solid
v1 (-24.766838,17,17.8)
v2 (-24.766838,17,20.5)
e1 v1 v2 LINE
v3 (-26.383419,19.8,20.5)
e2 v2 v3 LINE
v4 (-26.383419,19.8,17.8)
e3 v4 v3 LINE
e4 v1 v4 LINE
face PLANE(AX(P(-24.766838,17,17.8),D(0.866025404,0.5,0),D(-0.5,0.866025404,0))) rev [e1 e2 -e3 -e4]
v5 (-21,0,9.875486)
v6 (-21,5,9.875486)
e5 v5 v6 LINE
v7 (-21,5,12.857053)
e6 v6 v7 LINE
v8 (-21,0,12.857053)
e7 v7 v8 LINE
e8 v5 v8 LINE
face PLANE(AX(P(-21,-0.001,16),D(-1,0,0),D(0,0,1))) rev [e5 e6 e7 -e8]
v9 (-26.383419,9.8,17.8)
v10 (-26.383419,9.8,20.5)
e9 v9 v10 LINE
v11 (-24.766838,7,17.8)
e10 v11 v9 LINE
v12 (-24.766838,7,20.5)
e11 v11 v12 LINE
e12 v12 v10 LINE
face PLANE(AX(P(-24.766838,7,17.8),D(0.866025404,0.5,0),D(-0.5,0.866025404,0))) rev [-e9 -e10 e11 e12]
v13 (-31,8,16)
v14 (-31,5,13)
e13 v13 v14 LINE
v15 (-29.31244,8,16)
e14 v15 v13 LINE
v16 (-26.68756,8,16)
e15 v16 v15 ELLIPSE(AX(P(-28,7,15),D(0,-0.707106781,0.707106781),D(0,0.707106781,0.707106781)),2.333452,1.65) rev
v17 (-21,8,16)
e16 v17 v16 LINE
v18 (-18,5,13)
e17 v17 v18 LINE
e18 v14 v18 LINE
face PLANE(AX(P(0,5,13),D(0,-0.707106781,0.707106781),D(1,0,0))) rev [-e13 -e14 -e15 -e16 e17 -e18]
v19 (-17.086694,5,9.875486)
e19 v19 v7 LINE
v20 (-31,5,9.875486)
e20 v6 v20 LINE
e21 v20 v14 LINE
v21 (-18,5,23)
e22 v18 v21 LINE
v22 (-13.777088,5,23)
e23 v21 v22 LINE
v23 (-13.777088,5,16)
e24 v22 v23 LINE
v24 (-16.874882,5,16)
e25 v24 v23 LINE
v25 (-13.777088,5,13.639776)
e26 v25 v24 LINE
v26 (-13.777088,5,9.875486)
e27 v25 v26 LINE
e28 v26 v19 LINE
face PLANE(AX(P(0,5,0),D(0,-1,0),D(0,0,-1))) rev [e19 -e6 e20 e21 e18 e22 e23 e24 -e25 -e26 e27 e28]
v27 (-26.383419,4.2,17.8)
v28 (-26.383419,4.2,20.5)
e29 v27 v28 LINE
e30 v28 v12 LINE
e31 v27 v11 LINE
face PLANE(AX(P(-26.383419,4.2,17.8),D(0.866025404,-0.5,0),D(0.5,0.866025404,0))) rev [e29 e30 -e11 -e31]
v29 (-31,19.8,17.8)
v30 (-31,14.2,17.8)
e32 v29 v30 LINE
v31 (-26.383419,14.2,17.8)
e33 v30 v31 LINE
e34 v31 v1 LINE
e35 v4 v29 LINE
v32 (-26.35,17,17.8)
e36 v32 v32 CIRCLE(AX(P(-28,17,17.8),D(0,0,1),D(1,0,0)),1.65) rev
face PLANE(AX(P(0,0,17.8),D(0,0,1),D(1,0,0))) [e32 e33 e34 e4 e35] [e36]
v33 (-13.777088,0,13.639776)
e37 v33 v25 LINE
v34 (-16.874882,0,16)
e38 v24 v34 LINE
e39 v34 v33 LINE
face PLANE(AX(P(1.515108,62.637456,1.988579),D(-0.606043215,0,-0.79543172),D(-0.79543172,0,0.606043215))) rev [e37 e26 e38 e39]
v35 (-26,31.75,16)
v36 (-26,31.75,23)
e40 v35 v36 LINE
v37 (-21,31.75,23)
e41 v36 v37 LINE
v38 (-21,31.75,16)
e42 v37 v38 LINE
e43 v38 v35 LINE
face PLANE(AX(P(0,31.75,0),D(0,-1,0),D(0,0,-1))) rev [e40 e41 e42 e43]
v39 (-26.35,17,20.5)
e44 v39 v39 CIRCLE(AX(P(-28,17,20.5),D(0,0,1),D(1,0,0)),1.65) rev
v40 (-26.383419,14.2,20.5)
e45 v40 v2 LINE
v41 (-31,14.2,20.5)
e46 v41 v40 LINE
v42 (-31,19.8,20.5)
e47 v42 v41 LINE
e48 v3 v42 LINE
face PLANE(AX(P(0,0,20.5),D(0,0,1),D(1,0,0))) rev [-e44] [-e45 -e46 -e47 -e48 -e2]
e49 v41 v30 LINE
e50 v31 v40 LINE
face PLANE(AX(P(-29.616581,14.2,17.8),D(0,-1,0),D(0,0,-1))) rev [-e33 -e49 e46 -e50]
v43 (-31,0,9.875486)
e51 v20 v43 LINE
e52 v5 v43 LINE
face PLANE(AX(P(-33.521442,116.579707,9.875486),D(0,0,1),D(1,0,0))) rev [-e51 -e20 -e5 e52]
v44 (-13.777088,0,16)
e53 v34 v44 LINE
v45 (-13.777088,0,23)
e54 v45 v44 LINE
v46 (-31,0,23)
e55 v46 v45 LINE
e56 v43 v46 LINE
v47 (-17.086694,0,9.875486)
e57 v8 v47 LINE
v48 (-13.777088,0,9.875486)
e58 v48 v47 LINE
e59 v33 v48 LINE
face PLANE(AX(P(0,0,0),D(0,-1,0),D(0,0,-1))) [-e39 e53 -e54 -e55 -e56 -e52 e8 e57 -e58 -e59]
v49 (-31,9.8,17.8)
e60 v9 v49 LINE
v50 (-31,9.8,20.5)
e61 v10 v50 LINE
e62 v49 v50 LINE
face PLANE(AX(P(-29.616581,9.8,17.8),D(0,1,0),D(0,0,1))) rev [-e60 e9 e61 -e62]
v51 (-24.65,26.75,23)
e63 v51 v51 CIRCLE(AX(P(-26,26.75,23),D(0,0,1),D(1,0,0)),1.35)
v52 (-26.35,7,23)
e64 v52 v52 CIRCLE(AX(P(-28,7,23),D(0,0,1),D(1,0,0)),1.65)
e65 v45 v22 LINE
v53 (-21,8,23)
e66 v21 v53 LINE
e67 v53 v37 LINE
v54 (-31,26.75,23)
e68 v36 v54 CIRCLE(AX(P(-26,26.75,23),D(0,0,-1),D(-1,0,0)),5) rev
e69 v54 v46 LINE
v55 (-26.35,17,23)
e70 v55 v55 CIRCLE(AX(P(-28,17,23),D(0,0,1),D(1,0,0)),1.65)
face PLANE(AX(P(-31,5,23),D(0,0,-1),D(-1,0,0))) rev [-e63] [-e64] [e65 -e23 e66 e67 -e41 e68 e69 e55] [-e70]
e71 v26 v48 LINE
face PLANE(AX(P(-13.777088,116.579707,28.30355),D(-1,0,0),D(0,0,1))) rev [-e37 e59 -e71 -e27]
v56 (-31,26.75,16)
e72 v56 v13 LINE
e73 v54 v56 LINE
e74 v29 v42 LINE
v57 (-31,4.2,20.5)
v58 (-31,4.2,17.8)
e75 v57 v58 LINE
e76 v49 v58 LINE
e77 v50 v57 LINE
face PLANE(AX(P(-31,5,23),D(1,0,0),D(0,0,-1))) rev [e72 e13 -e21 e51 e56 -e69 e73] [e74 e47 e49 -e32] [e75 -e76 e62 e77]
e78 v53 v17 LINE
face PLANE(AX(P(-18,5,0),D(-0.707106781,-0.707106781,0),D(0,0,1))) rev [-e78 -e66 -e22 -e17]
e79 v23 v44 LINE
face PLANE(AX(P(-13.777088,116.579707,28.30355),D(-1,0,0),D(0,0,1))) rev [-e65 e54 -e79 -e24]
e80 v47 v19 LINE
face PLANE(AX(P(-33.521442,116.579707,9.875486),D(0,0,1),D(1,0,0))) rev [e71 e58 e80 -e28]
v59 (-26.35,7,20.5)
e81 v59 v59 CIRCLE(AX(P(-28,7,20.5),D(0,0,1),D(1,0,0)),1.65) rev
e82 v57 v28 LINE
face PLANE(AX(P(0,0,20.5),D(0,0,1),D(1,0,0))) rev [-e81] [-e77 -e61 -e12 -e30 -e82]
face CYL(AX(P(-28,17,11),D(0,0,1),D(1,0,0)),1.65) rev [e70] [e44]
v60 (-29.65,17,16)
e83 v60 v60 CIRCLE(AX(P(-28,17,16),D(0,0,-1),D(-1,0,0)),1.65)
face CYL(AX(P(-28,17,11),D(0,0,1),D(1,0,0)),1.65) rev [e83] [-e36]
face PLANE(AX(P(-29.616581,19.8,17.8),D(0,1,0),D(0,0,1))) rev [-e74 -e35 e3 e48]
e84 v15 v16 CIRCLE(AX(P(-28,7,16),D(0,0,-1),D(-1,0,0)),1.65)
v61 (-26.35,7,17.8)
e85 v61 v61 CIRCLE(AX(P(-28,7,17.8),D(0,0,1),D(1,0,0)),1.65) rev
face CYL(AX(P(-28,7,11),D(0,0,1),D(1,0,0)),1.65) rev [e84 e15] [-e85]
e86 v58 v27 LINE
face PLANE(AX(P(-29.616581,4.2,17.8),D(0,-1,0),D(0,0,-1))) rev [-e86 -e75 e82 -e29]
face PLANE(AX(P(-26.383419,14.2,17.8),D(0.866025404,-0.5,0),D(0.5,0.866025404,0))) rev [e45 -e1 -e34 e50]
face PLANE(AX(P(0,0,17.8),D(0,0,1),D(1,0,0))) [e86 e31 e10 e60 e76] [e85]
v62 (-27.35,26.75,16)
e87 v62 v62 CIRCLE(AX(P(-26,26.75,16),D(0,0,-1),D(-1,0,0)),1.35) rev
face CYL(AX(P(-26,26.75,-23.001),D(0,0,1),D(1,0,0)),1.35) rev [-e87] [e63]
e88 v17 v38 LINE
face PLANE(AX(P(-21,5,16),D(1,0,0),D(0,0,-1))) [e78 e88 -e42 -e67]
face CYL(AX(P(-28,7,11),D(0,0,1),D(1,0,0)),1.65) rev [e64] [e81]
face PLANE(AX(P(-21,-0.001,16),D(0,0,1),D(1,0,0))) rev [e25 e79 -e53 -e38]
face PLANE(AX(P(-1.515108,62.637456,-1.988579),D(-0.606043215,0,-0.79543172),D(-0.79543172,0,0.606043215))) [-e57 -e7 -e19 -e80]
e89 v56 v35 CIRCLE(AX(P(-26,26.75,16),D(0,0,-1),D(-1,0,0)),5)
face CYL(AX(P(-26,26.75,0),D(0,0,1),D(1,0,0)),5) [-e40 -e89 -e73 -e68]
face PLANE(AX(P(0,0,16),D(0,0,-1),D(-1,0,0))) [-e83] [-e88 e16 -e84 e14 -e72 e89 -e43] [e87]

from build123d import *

# Parameters (mm, degrees)
SKETCH_1_W           = 62
SKETCH_1_H           = 46
EXTRUDE_1_DEPTH      = 5
SKETCH_2_W           = 10
SKETCH_2_H           = 17
EXTRUDE_2_DEPTH      = 7
SKETCH_3_R           = 1.65
CUT_EXTRUDE_1_DEPTH  = 12
SKETCH_7_W           = 10
SKETCH_7_H           = 7
EXTRUDE_4_DEPTH      = 9.75
CUT_EXTRUDE_4_REACH  = 65.914
SKETCH_8_R           = 1.35
CUT_EXTRUDE_2_DEPTH  = 2.7
CUT_EXTRUDE_3_REACH  = 51.981
SKETCH_5_W           = 42
SKETCH_5_H           = 32
EXTRUDE_3_DEPTH      = 5
CHAMFER_4_SIZE       = 3
FILLET_1_R           = 5
SKETCH_9_OUTSIDE_W   = 80.694
SKETCH_9_OUTSIDE_H   = 64.694
SKETCH_9_OUTSIDE_W_2 = 19.744354218
SKETCH_9_OUTSIDE_H_2 = 18.428063936
CUT_EXTRUDE_5_DEPTH  = 31.75


with BuildPart() as part:
    # 草图1 → 凸台-拉伸1 (new body)
    with BuildSketch(Plane(origin=(0, 0, 0), x_dir=(1, 0, 0), z_dir=(0, 1, 0))):
        Rectangle(SKETCH_1_W, SKETCH_1_H)
    extrude(amount=EXTRUDE_1_DEPTH)

    # 草图2 → 凸台-拉伸2 (add)
    with BuildSketch(Plane.XY.offset(23)):
        with Locations((-26, 13.5)):
            Rectangle(SKETCH_2_W, SKETCH_2_H)
        with Locations((26, 13.5)):
            Rectangle(SKETCH_2_W, SKETCH_2_H)
    extrude_2 = extrude(amount=-EXTRUDE_2_DEPTH)

    # 草图3 → 切除-拉伸1 (cut)
    with BuildSketch(Plane.XY.offset(23)):
        with Locations((-28, 17)):
            Circle(SKETCH_3_R)
        with Locations((-28, 7)):
            Circle(SKETCH_3_R)
        with Locations((28, 7)):
            Circle(SKETCH_3_R)
        with Locations((28, 17)):
            Circle(SKETCH_3_R)
    cut_extrude_1 = extrude(amount=-CUT_EXTRUDE_1_DEPTH, mode=Mode.SUBTRACT)

    # 草图7 → 凸台-拉伸4 (add)
    with BuildSketch(Plane(origin=(0, 22, 0), x_dir=(1, 0, 0), z_dir=(0, 1, 0))):
        with Locations((-26, -19.5)):
            Rectangle(SKETCH_7_W, SKETCH_7_H)
        with Locations((26, -19.5)):
            Rectangle(SKETCH_7_W, SKETCH_7_H)
    extrude_4 = extrude(amount=EXTRUDE_4_DEPTH)

    # 草图8 → 切除-拉伸4 (cut, up to next)
    with BuildSketch(Plane.XY.offset(23), mode=Mode.PRIVATE) as cut_extrude_4_sk1:
        with Locations((-26, 26.75)):
            Circle(SKETCH_8_R)
    cut_extrude_4_tool1 = extrude(cut_extrude_4_sk1.sketch, amount=-CUT_EXTRUDE_4_REACH, mode=Mode.PRIVATE) & part.part
    # 草图8 → 切除-拉伸4 (cut, up to next)
    with BuildSketch(Plane.XY.offset(23), mode=Mode.PRIVATE) as cut_extrude_4_sk2:
        with Locations((26, 26.75)):
            Circle(SKETCH_8_R)
    cut_extrude_4_tool2 = extrude(cut_extrude_4_sk2.sketch, amount=-CUT_EXTRUDE_4_REACH, mode=Mode.PRIVATE) & part.part
    cut_extrude_4_1 = cut_extrude_4_tool1.solids().sort_by_distance((-26, 26.75, 23))[0]
    add(cut_extrude_4_1, mode=Mode.SUBTRACT)
    cut_extrude_4_2 = cut_extrude_4_tool2.solids().sort_by_distance((26, 26.75, 23))[0]
    add(cut_extrude_4_2, mode=Mode.SUBTRACT)
    cut_extrude_4 = cut_extrude_4_1 + cut_extrude_4_2  # 切除-拉伸4 as one shape, for the pattern or mirror that repeats it

    # 草图4 → 切除-拉伸2 (cut)
    with BuildSketch(Plane.XY.offset(20.5)):
        Polygon((-29.616580754, 19.8), (-31.233161507, 19.8), (-31.233161507, 17), (-31.233161507, 14.2), (-29.616580754, 14.2), (-26.383419246, 14.2), (-24.766838493, 17), (-26.383419246, 19.8), align=None)
        Polygon((-24.766838493, 7), (-26.383419246, 9.8), (-29.616580754, 9.8), (-31.233161507, 9.8), (-31.233161507, 7), (-31.233161507, 4.2), (-29.616580754, 4.2), (-26.383419246, 4.2), align=None)
        Polygon((24.766838493, 17), (26.383419246, 14.2), (29.616580754, 14.2), (31.233161507, 14.2), (31.233161507, 17), (31.233161507, 19.8), (29.616580754, 19.8), (26.383419246, 19.8), align=None)
        Polygon((24.766838493, 7), (26.383419246, 4.2), (29.616580754, 4.2), (31.233161507, 4.2), (31.233161507, 7), (31.233161507, 9.8), (29.616580754, 9.8), (26.383419246, 9.8), align=None)
    cut_extrude_2 = extrude(amount=-CUT_EXTRUDE_2_DEPTH, mode=Mode.SUBTRACT)

    # 镜向1: 凸台-拉伸2, 切除-拉伸1, 凸台-拉伸4, 切除-拉伸4, 切除-拉伸2 across plane
    add(extrude_2.mirror(Plane.XY))
    add(cut_extrude_1.mirror(Plane.XY), mode=Mode.SUBTRACT)
    add(extrude_4.mirror(Plane.XY))
    add(cut_extrude_4.mirror(Plane.XY), mode=Mode.SUBTRACT)
    add(cut_extrude_2.mirror(Plane.XY), mode=Mode.SUBTRACT)

    # 草图5 → 切除-拉伸3 (cut, up to next)
    with BuildSketch(Plane(origin=(0, 31.75, 0), x_dir=(1, 0, 0), z_dir=(0, 1, 0)), mode=Mode.PRIVATE) as cut_extrude_3_sk1:
        Rectangle(SKETCH_5_W, SKETCH_5_H)
    cut_extrude_3_tool1 = extrude(cut_extrude_3_sk1.sketch, amount=-CUT_EXTRUDE_3_REACH, mode=Mode.PRIVATE) & part.part
    add(cut_extrude_3_tool1.solids().sort_by_distance((0, 31.75, 0))[0], mode=Mode.SUBTRACT)

    # 草图6 → 凸台-拉伸3 (add)
    with BuildSketch(Plane(origin=(0, 0, 0), x_dir=(1, 0, 0), z_dir=(0, 1, 0))):
        Polygon((-22.515108038, 14.0114207), (-4.12511837, 0), (0, 3.142947329), (-19.484891962, 17.9885793), align=None)
        Polygon((0, 3.142947329), (4.12511837, 0), (22.515108038, 14.0114207), (19.484891962, 17.9885793), align=None)
        Polygon((-4.12511837, 0), (0, -3.142947329), (4.12511837, 0), (0, 3.142947329), align=None)
        Polygon((-19.484891962, -17.9885793), (0, -3.142947329), (-4.12511837, 0), (-22.515108038, -14.0114207), align=None)
        Polygon((0, -3.142947329), (19.484891962, -17.9885793), (22.515108038, -14.0114207), (4.12511837, 0), align=None)
    extrude(amount=EXTRUDE_3_DEPTH)

    # 倒角4
    # the kernel refuses this chamfer: 3 mm, written as the material it adds along each edge
    with BuildSketch(Plane(origin=(-31, 5, 16), x_dir=(0, -0.027495876610586494, -0.9996219169112968), z_dir=(1, 0, 0))) as chamfer_4_piece_1_section:
        Polygon((CHAMFER_4_SIZE * 0.999621916911, CHAMFER_4_SIZE * 0.0274958766106), (-CHAMFER_4_SIZE * 0.0274958766106, CHAMFER_4_SIZE * 0.999621916911), (0, 0), align=None)
    chamfer_4_piece_1 = extrude(amount=10, mode=Mode.PRIVATE)
    chamfer_4_piece_1 = chamfer_4_piece_1 - Plane(origin=(-28, 7, 14.954388988), x_dir=(1, 0, 0), z_dir=(0, 0, 1)) * Cylinder(1.65, 32, mode=Mode.PRIVATE)
    add(chamfer_4_piece_1)
    with BuildSketch(Plane(origin=(-21, 5, 23), x_dir=(-0.02749587661058678, 0.9996219169112968, 0), z_dir=(0, 0, -1)), Plane(origin=(-21, 5, -23), x_dir=(0.9996219169112968, -0.02749587661058648, 0), z_dir=(0, 0, 1)), Plane(origin=(21, 5, 23), x_dir=(-0.9996219169112968, -0.02749587661058619, 0), z_dir=(0, 0, -1))) as chamfer_4_piece_2:
        Polygon((CHAMFER_4_SIZE * 0.999621916911, CHAMFER_4_SIZE * 0.0274958766106), (-CHAMFER_4_SIZE * 0.0274958766106, CHAMFER_4_SIZE * 0.999621916911), (0, 0), align=None)
    extrude(amount=7)
    with BuildSketch(Plane(origin=(-31, 5, -16), x_dir=(0, -0.027495876610586494, 0.9996219169112968), z_dir=(1, 0, 0))) as chamfer_4_piece_3_section:
        Polygon((CHAMFER_4_SIZE * 0.999621916911, -CHAMFER_4_SIZE * 0.0274958766106), (-CHAMFER_4_SIZE * 0.0274958766106, -CHAMFER_4_SIZE * 0.999621916911), (0, 0), align=None)
    chamfer_4_piece_3 = extrude(amount=10, mode=Mode.PRIVATE)
    chamfer_4_piece_3 = chamfer_4_piece_3 - Plane(origin=(-28, 7, -14.954388988), x_dir=(1, 0, 0), z_dir=(0, 0, -1)) * Cylinder(1.65, 32, mode=Mode.PRIVATE)
    add(chamfer_4_piece_3)
    with BuildSketch(Plane(origin=(21, 5, -23), x_dir=(-0.9996219169112968, -0.02749587661058619, 0), z_dir=(0, 0, 1))) as chamfer_4_piece_4:
        Polygon((CHAMFER_4_SIZE * 0.999621916911, -CHAMFER_4_SIZE * 0.0274958766106), (-CHAMFER_4_SIZE * 0.0274958766106, -CHAMFER_4_SIZE * 0.999621916911), (0, 0), align=None)
    extrude(amount=7)
    with BuildSketch(Plane(origin=(31, 5, -16), x_dir=(0, -0.027495876610586494, 0.9996219169112968), z_dir=(-1, 0, 0))) as chamfer_4_piece_5_section:
        Polygon((CHAMFER_4_SIZE * 0.999621916911, CHAMFER_4_SIZE * 0.0274958766106), (-CHAMFER_4_SIZE * 0.0274958766106, CHAMFER_4_SIZE * 0.999621916911), (0, 0), align=None)
    chamfer_4_piece_5 = extrude(amount=10, mode=Mode.PRIVATE)
    chamfer_4_piece_5 = chamfer_4_piece_5 - Plane(origin=(28, 7, -14.954389008), x_dir=(1, 0, 0), z_dir=(0, 0, -1)) * Cylinder(1.65, 32, mode=Mode.PRIVATE)
    add(chamfer_4_piece_5)
    with BuildSketch(Plane(origin=(31, 5, 16), x_dir=(0, -0.027495876610586494, -0.9996219169112968), z_dir=(-1, 0, 0))) as chamfer_4_piece_6_section:
        Polygon((CHAMFER_4_SIZE * 0.999621916911, -CHAMFER_4_SIZE * 0.0274958766106), (-CHAMFER_4_SIZE * 0.0274958766106, -CHAMFER_4_SIZE * 0.999621916911), (0, 0), align=None)
    chamfer_4_piece_6 = extrude(amount=10, mode=Mode.PRIVATE)
    chamfer_4_piece_6 = chamfer_4_piece_6 - Plane(origin=(28, 7, 14.954389008), x_dir=(1, 0, 0), z_dir=(0, 0, 1)) * Cylinder(1.65, 32, mode=Mode.PRIVATE)
    add(chamfer_4_piece_6)
    with BuildSketch(Plane(origin=(-21, 5, 23), x_dir=(-0.02749587661058678, 0.9996219169112968, 0), z_dir=(0, 0, -1))) as chamfer_4_piece_7a_section:
        Polygon((CHAMFER_4_SIZE * 0.999621916911, CHAMFER_4_SIZE * 0.0274958766106), (-CHAMFER_4_SIZE * 0.0274958766106, CHAMFER_4_SIZE * 0.999621916911), (0, 0), align=None)
    chamfer_4_piece_7a = extrude(amount=14.715048964, mode=Mode.PRIVATE)
    chamfer_4_piece_7a = split(chamfer_4_piece_7a, bisect_by=Plane(origin=(-19.8988735, 5.929641192, 16), z_dir=(0, 0, -1)), keep=Keep.TOP, mode=Mode.PRIVATE)
    chamfer_4_piece_7a = split(chamfer_4_piece_7a, bisect_by=Plane(origin=(-20.858643002, 5.929641192, 12.749352101), z_dir=(0.6060432152628566, 0, 0.7954317200324984)), keep=Keep.TOP, mode=Mode.PRIVATE)
    with BuildSketch(Plane(origin=(-31, 5, 16), x_dir=(0, -0.027495876610586494, -0.9996219169112968), z_dir=(1, 0, 0))) as chamfer_4_piece_7b_section:
        Polygon((CHAMFER_4_SIZE * 0.999621916911, CHAMFER_4_SIZE * 0.0274958766106), (-CHAMFER_4_SIZE * 0.0274958766106, CHAMFER_4_SIZE * 0.999621916911), (0, 0), align=None)
    chamfer_4_piece_7b = extrude(amount=17.715048964, mode=Mode.PRIVATE)
    chamfer_4_piece_7b = split(chamfer_4_piece_7b, bisect_by=Plane(origin=(-21, 5.915915897, 14.873215442), z_dir=(1, 0, 0)), keep=Keep.TOP, mode=Mode.PRIVATE)
    chamfer_4_piece_7b = split(chamfer_4_piece_7b, bisect_by=Plane(origin=(-17.170062576, 5.915915897, 16.224899768), z_dir=(-0.6060432152628568, 0, -0.7954317200324983)), keep=Keep.TOP, mode=Mode.PRIVATE)
    chamfer_4_piece_7 = chamfer_4_piece_7a & chamfer_4_piece_7b
    add(chamfer_4_piece_7)
    with BuildSketch(Plane(origin=(-21, 5, -23), x_dir=(0.9996219169112968, -0.02749587661058648, 0), z_dir=(0, 0, 1))) as chamfer_4_piece_8a_section:
        Polygon((CHAMFER_4_SIZE * 0.999621916911, CHAMFER_4_SIZE * 0.0274958766106), (-CHAMFER_4_SIZE * 0.0274958766106, CHAMFER_4_SIZE * 0.999621916911), (0, 0), align=None)
    chamfer_4_piece_8a = extrude(amount=14.715048964, mode=Mode.PRIVATE)
    chamfer_4_piece_8a = split(chamfer_4_piece_8a, bisect_by=Plane(origin=(-20.858643002, 5.929641192, -12.749352101), z_dir=(0.6060432152628563, 0, -0.7954317200324986)), keep=Keep.TOP, mode=Mode.PRIVATE)
    chamfer_4_piece_8a = split(chamfer_4_piece_8a, bisect_by=Plane(origin=(-19.8988735, 5.929641192, -16), z_dir=(0, 0, 1)), keep=Keep.TOP, mode=Mode.PRIVATE)
    with BuildSketch(Plane(origin=(-31, 5, -16), x_dir=(0, -0.027495876610586494, 0.9996219169112968), z_dir=(1, 0, 0))) as chamfer_4_piece_8b_section:
        Polygon((CHAMFER_4_SIZE * 0.999621916911, -CHAMFER_4_SIZE * 0.0274958766106), (-CHAMFER_4_SIZE * 0.0274958766106, -CHAMFER_4_SIZE * 0.999621916911), (0, 0), align=None)
    chamfer_4_piece_8b = extrude(amount=17.715048964, mode=Mode.PRIVATE)
    chamfer_4_piece_8b = split(chamfer_4_piece_8b, bisect_by=Plane(origin=(-17.170062576, 5.915915897, -16.224899768), z_dir=(-0.6060432152628565, 0, 0.7954317200324984)), keep=Keep.TOP, mode=Mode.PRIVATE)
    chamfer_4_piece_8b = split(chamfer_4_piece_8b, bisect_by=Plane(origin=(-21, 5.915915897, -14.873215442), z_dir=(1, 0, 0)), keep=Keep.TOP, mode=Mode.PRIVATE)
    chamfer_4_piece_8 = chamfer_4_piece_8a & chamfer_4_piece_8b
    add(chamfer_4_piece_8)
    with BuildSketch(Plane(origin=(31, 5, -16), x_dir=(0, -0.027495876610586494, 0.9996219169112968), z_dir=(-1, 0, 0))) as chamfer_4_piece_9a_section:
        Polygon((CHAMFER_4_SIZE * 0.999621916911, CHAMFER_4_SIZE * 0.0274958766106), (-CHAMFER_4_SIZE * 0.0274958766106, CHAMFER_4_SIZE * 0.999621916911), (0, 0), align=None)
    chamfer_4_piece_9a = extrude(amount=17.715048964, mode=Mode.PRIVATE)
    chamfer_4_piece_9a = split(chamfer_4_piece_9a, bisect_by=Plane(origin=(17.170062576, 5.915915897, -16.224899768), z_dir=(0.6060432152628568, 0, 0.7954317200324984)), keep=Keep.TOP, mode=Mode.PRIVATE)
    chamfer_4_piece_9a = split(chamfer_4_piece_9a, bisect_by=Plane(origin=(21, 5.915915897, -14.873215442), z_dir=(-1, 0, 0)), keep=Keep.TOP, mode=Mode.PRIVATE)
    with BuildSketch(Plane(origin=(21, 5, -23), x_dir=(-0.9996219169112968, -0.02749587661058619, 0), z_dir=(0, 0, 1))) as chamfer_4_piece_9b_section:
        Polygon((CHAMFER_4_SIZE * 0.999621916911, -CHAMFER_4_SIZE * 0.0274958766106), (-CHAMFER_4_SIZE * 0.0274958766106, -CHAMFER_4_SIZE * 0.999621916911), (0, 0), align=None)
    chamfer_4_piece_9b = extrude(amount=14.715048964, mode=Mode.PRIVATE)
    chamfer_4_piece_9b = split(chamfer_4_piece_9b, bisect_by=Plane(origin=(20.858643002, 5.929641192, -12.749352101), z_dir=(-0.6060432152628568, 0, -0.7954317200324983)), keep=Keep.TOP, mode=Mode.PRIVATE)
    chamfer_4_piece_9b = split(chamfer_4_piece_9b, bisect_by=Plane(origin=(19.8988735, 5.929641192, -16), z_dir=(0, 0, 1)), keep=Keep.TOP, mode=Mode.PRIVATE)
    chamfer_4_piece_9 = chamfer_4_piece_9a & chamfer_4_piece_9b
    add(chamfer_4_piece_9)
    with BuildSketch(Plane(origin=(21, 5, 23), x_dir=(-0.9996219169112968, -0.02749587661058619, 0), z_dir=(0, 0, -1))) as chamfer_4_piece_10a_section:
        Polygon((CHAMFER_4_SIZE * 0.999621916911, CHAMFER_4_SIZE * 0.0274958766106), (-CHAMFER_4_SIZE * 0.0274958766106, CHAMFER_4_SIZE * 0.999621916911), (0, 0), align=None)
    chamfer_4_piece_10a = extrude(amount=14.715048964, mode=Mode.PRIVATE)
    chamfer_4_piece_10a = split(chamfer_4_piece_10a, bisect_by=Plane(origin=(20.858643002, 5.929641192, 12.749352101), z_dir=(-0.6060432152628565, 0, 0.7954317200324984)), keep=Keep.TOP, mode=Mode.PRIVATE)
    chamfer_4_piece_10a = split(chamfer_4_piece_10a, bisect_by=Plane(origin=(19.8988735, 5.929641192, 16), z_dir=(0, 0, -1)), keep=Keep.TOP, mode=Mode.PRIVATE)
    with BuildSketch(Plane(origin=(31, 5, 16), x_dir=(0, -0.027495876610586494, -0.9996219169112968), z_dir=(-1, 0, 0))) as chamfer_4_piece_10b_section:
        Polygon((CHAMFER_4_SIZE * 0.999621916911, -CHAMFER_4_SIZE * 0.0274958766106), (-CHAMFER_4_SIZE * 0.0274958766106, -CHAMFER_4_SIZE * 0.999621916911), (0, 0), align=None)
    chamfer_4_piece_10b = extrude(amount=17.715048964, mode=Mode.PRIVATE)
    chamfer_4_piece_10b = split(chamfer_4_piece_10b, bisect_by=Plane(origin=(17.170062576, 5.915915897, 16.224899768), z_dir=(0.6060432152628563, 0, -0.7954317200324986)), keep=Keep.TOP, mode=Mode.PRIVATE)
    chamfer_4_piece_10b = split(chamfer_4_piece_10b, bisect_by=Plane(origin=(21, 5.915915897, 14.873215442), z_dir=(-1, 0, 0)), keep=Keep.TOP, mode=Mode.PRIVATE)
    chamfer_4_piece_10 = chamfer_4_piece_10a & chamfer_4_piece_10b
    add(chamfer_4_piece_10)

    # 圆角1
    fillet_1_edges = [part.edges().sort_by_distance(p)[0] for p in [
        (-31, 31.75, -19.5),
        (31, 31.75, -19.5),
        (-31, 31.75, 19.5),
        (31, 31.75, 19.5),
    ]]
    fillet(fillet_1_edges, radius=FILLET_1_R)

    # 草图9 outside → 切除-拉伸5 (cut)
    with BuildSketch(Plane(origin=(0, 0, 0), x_dir=(1, 0, 0), z_dir=(0, 1, 0))):
        Rectangle(SKETCH_9_OUTSIDE_W, SKETCH_9_OUTSIDE_H)
        with Locations((-23.649265304, -19.089518312)):
            Rectangle(SKETCH_9_OUTSIDE_W_2, SKETCH_9_OUTSIDE_H_2, mode=Mode.SUBTRACT)
    extrude(amount=CUT_EXTRUDE_5_DEPTH, mode=Mode.SUBTRACT)


solid = part.part
